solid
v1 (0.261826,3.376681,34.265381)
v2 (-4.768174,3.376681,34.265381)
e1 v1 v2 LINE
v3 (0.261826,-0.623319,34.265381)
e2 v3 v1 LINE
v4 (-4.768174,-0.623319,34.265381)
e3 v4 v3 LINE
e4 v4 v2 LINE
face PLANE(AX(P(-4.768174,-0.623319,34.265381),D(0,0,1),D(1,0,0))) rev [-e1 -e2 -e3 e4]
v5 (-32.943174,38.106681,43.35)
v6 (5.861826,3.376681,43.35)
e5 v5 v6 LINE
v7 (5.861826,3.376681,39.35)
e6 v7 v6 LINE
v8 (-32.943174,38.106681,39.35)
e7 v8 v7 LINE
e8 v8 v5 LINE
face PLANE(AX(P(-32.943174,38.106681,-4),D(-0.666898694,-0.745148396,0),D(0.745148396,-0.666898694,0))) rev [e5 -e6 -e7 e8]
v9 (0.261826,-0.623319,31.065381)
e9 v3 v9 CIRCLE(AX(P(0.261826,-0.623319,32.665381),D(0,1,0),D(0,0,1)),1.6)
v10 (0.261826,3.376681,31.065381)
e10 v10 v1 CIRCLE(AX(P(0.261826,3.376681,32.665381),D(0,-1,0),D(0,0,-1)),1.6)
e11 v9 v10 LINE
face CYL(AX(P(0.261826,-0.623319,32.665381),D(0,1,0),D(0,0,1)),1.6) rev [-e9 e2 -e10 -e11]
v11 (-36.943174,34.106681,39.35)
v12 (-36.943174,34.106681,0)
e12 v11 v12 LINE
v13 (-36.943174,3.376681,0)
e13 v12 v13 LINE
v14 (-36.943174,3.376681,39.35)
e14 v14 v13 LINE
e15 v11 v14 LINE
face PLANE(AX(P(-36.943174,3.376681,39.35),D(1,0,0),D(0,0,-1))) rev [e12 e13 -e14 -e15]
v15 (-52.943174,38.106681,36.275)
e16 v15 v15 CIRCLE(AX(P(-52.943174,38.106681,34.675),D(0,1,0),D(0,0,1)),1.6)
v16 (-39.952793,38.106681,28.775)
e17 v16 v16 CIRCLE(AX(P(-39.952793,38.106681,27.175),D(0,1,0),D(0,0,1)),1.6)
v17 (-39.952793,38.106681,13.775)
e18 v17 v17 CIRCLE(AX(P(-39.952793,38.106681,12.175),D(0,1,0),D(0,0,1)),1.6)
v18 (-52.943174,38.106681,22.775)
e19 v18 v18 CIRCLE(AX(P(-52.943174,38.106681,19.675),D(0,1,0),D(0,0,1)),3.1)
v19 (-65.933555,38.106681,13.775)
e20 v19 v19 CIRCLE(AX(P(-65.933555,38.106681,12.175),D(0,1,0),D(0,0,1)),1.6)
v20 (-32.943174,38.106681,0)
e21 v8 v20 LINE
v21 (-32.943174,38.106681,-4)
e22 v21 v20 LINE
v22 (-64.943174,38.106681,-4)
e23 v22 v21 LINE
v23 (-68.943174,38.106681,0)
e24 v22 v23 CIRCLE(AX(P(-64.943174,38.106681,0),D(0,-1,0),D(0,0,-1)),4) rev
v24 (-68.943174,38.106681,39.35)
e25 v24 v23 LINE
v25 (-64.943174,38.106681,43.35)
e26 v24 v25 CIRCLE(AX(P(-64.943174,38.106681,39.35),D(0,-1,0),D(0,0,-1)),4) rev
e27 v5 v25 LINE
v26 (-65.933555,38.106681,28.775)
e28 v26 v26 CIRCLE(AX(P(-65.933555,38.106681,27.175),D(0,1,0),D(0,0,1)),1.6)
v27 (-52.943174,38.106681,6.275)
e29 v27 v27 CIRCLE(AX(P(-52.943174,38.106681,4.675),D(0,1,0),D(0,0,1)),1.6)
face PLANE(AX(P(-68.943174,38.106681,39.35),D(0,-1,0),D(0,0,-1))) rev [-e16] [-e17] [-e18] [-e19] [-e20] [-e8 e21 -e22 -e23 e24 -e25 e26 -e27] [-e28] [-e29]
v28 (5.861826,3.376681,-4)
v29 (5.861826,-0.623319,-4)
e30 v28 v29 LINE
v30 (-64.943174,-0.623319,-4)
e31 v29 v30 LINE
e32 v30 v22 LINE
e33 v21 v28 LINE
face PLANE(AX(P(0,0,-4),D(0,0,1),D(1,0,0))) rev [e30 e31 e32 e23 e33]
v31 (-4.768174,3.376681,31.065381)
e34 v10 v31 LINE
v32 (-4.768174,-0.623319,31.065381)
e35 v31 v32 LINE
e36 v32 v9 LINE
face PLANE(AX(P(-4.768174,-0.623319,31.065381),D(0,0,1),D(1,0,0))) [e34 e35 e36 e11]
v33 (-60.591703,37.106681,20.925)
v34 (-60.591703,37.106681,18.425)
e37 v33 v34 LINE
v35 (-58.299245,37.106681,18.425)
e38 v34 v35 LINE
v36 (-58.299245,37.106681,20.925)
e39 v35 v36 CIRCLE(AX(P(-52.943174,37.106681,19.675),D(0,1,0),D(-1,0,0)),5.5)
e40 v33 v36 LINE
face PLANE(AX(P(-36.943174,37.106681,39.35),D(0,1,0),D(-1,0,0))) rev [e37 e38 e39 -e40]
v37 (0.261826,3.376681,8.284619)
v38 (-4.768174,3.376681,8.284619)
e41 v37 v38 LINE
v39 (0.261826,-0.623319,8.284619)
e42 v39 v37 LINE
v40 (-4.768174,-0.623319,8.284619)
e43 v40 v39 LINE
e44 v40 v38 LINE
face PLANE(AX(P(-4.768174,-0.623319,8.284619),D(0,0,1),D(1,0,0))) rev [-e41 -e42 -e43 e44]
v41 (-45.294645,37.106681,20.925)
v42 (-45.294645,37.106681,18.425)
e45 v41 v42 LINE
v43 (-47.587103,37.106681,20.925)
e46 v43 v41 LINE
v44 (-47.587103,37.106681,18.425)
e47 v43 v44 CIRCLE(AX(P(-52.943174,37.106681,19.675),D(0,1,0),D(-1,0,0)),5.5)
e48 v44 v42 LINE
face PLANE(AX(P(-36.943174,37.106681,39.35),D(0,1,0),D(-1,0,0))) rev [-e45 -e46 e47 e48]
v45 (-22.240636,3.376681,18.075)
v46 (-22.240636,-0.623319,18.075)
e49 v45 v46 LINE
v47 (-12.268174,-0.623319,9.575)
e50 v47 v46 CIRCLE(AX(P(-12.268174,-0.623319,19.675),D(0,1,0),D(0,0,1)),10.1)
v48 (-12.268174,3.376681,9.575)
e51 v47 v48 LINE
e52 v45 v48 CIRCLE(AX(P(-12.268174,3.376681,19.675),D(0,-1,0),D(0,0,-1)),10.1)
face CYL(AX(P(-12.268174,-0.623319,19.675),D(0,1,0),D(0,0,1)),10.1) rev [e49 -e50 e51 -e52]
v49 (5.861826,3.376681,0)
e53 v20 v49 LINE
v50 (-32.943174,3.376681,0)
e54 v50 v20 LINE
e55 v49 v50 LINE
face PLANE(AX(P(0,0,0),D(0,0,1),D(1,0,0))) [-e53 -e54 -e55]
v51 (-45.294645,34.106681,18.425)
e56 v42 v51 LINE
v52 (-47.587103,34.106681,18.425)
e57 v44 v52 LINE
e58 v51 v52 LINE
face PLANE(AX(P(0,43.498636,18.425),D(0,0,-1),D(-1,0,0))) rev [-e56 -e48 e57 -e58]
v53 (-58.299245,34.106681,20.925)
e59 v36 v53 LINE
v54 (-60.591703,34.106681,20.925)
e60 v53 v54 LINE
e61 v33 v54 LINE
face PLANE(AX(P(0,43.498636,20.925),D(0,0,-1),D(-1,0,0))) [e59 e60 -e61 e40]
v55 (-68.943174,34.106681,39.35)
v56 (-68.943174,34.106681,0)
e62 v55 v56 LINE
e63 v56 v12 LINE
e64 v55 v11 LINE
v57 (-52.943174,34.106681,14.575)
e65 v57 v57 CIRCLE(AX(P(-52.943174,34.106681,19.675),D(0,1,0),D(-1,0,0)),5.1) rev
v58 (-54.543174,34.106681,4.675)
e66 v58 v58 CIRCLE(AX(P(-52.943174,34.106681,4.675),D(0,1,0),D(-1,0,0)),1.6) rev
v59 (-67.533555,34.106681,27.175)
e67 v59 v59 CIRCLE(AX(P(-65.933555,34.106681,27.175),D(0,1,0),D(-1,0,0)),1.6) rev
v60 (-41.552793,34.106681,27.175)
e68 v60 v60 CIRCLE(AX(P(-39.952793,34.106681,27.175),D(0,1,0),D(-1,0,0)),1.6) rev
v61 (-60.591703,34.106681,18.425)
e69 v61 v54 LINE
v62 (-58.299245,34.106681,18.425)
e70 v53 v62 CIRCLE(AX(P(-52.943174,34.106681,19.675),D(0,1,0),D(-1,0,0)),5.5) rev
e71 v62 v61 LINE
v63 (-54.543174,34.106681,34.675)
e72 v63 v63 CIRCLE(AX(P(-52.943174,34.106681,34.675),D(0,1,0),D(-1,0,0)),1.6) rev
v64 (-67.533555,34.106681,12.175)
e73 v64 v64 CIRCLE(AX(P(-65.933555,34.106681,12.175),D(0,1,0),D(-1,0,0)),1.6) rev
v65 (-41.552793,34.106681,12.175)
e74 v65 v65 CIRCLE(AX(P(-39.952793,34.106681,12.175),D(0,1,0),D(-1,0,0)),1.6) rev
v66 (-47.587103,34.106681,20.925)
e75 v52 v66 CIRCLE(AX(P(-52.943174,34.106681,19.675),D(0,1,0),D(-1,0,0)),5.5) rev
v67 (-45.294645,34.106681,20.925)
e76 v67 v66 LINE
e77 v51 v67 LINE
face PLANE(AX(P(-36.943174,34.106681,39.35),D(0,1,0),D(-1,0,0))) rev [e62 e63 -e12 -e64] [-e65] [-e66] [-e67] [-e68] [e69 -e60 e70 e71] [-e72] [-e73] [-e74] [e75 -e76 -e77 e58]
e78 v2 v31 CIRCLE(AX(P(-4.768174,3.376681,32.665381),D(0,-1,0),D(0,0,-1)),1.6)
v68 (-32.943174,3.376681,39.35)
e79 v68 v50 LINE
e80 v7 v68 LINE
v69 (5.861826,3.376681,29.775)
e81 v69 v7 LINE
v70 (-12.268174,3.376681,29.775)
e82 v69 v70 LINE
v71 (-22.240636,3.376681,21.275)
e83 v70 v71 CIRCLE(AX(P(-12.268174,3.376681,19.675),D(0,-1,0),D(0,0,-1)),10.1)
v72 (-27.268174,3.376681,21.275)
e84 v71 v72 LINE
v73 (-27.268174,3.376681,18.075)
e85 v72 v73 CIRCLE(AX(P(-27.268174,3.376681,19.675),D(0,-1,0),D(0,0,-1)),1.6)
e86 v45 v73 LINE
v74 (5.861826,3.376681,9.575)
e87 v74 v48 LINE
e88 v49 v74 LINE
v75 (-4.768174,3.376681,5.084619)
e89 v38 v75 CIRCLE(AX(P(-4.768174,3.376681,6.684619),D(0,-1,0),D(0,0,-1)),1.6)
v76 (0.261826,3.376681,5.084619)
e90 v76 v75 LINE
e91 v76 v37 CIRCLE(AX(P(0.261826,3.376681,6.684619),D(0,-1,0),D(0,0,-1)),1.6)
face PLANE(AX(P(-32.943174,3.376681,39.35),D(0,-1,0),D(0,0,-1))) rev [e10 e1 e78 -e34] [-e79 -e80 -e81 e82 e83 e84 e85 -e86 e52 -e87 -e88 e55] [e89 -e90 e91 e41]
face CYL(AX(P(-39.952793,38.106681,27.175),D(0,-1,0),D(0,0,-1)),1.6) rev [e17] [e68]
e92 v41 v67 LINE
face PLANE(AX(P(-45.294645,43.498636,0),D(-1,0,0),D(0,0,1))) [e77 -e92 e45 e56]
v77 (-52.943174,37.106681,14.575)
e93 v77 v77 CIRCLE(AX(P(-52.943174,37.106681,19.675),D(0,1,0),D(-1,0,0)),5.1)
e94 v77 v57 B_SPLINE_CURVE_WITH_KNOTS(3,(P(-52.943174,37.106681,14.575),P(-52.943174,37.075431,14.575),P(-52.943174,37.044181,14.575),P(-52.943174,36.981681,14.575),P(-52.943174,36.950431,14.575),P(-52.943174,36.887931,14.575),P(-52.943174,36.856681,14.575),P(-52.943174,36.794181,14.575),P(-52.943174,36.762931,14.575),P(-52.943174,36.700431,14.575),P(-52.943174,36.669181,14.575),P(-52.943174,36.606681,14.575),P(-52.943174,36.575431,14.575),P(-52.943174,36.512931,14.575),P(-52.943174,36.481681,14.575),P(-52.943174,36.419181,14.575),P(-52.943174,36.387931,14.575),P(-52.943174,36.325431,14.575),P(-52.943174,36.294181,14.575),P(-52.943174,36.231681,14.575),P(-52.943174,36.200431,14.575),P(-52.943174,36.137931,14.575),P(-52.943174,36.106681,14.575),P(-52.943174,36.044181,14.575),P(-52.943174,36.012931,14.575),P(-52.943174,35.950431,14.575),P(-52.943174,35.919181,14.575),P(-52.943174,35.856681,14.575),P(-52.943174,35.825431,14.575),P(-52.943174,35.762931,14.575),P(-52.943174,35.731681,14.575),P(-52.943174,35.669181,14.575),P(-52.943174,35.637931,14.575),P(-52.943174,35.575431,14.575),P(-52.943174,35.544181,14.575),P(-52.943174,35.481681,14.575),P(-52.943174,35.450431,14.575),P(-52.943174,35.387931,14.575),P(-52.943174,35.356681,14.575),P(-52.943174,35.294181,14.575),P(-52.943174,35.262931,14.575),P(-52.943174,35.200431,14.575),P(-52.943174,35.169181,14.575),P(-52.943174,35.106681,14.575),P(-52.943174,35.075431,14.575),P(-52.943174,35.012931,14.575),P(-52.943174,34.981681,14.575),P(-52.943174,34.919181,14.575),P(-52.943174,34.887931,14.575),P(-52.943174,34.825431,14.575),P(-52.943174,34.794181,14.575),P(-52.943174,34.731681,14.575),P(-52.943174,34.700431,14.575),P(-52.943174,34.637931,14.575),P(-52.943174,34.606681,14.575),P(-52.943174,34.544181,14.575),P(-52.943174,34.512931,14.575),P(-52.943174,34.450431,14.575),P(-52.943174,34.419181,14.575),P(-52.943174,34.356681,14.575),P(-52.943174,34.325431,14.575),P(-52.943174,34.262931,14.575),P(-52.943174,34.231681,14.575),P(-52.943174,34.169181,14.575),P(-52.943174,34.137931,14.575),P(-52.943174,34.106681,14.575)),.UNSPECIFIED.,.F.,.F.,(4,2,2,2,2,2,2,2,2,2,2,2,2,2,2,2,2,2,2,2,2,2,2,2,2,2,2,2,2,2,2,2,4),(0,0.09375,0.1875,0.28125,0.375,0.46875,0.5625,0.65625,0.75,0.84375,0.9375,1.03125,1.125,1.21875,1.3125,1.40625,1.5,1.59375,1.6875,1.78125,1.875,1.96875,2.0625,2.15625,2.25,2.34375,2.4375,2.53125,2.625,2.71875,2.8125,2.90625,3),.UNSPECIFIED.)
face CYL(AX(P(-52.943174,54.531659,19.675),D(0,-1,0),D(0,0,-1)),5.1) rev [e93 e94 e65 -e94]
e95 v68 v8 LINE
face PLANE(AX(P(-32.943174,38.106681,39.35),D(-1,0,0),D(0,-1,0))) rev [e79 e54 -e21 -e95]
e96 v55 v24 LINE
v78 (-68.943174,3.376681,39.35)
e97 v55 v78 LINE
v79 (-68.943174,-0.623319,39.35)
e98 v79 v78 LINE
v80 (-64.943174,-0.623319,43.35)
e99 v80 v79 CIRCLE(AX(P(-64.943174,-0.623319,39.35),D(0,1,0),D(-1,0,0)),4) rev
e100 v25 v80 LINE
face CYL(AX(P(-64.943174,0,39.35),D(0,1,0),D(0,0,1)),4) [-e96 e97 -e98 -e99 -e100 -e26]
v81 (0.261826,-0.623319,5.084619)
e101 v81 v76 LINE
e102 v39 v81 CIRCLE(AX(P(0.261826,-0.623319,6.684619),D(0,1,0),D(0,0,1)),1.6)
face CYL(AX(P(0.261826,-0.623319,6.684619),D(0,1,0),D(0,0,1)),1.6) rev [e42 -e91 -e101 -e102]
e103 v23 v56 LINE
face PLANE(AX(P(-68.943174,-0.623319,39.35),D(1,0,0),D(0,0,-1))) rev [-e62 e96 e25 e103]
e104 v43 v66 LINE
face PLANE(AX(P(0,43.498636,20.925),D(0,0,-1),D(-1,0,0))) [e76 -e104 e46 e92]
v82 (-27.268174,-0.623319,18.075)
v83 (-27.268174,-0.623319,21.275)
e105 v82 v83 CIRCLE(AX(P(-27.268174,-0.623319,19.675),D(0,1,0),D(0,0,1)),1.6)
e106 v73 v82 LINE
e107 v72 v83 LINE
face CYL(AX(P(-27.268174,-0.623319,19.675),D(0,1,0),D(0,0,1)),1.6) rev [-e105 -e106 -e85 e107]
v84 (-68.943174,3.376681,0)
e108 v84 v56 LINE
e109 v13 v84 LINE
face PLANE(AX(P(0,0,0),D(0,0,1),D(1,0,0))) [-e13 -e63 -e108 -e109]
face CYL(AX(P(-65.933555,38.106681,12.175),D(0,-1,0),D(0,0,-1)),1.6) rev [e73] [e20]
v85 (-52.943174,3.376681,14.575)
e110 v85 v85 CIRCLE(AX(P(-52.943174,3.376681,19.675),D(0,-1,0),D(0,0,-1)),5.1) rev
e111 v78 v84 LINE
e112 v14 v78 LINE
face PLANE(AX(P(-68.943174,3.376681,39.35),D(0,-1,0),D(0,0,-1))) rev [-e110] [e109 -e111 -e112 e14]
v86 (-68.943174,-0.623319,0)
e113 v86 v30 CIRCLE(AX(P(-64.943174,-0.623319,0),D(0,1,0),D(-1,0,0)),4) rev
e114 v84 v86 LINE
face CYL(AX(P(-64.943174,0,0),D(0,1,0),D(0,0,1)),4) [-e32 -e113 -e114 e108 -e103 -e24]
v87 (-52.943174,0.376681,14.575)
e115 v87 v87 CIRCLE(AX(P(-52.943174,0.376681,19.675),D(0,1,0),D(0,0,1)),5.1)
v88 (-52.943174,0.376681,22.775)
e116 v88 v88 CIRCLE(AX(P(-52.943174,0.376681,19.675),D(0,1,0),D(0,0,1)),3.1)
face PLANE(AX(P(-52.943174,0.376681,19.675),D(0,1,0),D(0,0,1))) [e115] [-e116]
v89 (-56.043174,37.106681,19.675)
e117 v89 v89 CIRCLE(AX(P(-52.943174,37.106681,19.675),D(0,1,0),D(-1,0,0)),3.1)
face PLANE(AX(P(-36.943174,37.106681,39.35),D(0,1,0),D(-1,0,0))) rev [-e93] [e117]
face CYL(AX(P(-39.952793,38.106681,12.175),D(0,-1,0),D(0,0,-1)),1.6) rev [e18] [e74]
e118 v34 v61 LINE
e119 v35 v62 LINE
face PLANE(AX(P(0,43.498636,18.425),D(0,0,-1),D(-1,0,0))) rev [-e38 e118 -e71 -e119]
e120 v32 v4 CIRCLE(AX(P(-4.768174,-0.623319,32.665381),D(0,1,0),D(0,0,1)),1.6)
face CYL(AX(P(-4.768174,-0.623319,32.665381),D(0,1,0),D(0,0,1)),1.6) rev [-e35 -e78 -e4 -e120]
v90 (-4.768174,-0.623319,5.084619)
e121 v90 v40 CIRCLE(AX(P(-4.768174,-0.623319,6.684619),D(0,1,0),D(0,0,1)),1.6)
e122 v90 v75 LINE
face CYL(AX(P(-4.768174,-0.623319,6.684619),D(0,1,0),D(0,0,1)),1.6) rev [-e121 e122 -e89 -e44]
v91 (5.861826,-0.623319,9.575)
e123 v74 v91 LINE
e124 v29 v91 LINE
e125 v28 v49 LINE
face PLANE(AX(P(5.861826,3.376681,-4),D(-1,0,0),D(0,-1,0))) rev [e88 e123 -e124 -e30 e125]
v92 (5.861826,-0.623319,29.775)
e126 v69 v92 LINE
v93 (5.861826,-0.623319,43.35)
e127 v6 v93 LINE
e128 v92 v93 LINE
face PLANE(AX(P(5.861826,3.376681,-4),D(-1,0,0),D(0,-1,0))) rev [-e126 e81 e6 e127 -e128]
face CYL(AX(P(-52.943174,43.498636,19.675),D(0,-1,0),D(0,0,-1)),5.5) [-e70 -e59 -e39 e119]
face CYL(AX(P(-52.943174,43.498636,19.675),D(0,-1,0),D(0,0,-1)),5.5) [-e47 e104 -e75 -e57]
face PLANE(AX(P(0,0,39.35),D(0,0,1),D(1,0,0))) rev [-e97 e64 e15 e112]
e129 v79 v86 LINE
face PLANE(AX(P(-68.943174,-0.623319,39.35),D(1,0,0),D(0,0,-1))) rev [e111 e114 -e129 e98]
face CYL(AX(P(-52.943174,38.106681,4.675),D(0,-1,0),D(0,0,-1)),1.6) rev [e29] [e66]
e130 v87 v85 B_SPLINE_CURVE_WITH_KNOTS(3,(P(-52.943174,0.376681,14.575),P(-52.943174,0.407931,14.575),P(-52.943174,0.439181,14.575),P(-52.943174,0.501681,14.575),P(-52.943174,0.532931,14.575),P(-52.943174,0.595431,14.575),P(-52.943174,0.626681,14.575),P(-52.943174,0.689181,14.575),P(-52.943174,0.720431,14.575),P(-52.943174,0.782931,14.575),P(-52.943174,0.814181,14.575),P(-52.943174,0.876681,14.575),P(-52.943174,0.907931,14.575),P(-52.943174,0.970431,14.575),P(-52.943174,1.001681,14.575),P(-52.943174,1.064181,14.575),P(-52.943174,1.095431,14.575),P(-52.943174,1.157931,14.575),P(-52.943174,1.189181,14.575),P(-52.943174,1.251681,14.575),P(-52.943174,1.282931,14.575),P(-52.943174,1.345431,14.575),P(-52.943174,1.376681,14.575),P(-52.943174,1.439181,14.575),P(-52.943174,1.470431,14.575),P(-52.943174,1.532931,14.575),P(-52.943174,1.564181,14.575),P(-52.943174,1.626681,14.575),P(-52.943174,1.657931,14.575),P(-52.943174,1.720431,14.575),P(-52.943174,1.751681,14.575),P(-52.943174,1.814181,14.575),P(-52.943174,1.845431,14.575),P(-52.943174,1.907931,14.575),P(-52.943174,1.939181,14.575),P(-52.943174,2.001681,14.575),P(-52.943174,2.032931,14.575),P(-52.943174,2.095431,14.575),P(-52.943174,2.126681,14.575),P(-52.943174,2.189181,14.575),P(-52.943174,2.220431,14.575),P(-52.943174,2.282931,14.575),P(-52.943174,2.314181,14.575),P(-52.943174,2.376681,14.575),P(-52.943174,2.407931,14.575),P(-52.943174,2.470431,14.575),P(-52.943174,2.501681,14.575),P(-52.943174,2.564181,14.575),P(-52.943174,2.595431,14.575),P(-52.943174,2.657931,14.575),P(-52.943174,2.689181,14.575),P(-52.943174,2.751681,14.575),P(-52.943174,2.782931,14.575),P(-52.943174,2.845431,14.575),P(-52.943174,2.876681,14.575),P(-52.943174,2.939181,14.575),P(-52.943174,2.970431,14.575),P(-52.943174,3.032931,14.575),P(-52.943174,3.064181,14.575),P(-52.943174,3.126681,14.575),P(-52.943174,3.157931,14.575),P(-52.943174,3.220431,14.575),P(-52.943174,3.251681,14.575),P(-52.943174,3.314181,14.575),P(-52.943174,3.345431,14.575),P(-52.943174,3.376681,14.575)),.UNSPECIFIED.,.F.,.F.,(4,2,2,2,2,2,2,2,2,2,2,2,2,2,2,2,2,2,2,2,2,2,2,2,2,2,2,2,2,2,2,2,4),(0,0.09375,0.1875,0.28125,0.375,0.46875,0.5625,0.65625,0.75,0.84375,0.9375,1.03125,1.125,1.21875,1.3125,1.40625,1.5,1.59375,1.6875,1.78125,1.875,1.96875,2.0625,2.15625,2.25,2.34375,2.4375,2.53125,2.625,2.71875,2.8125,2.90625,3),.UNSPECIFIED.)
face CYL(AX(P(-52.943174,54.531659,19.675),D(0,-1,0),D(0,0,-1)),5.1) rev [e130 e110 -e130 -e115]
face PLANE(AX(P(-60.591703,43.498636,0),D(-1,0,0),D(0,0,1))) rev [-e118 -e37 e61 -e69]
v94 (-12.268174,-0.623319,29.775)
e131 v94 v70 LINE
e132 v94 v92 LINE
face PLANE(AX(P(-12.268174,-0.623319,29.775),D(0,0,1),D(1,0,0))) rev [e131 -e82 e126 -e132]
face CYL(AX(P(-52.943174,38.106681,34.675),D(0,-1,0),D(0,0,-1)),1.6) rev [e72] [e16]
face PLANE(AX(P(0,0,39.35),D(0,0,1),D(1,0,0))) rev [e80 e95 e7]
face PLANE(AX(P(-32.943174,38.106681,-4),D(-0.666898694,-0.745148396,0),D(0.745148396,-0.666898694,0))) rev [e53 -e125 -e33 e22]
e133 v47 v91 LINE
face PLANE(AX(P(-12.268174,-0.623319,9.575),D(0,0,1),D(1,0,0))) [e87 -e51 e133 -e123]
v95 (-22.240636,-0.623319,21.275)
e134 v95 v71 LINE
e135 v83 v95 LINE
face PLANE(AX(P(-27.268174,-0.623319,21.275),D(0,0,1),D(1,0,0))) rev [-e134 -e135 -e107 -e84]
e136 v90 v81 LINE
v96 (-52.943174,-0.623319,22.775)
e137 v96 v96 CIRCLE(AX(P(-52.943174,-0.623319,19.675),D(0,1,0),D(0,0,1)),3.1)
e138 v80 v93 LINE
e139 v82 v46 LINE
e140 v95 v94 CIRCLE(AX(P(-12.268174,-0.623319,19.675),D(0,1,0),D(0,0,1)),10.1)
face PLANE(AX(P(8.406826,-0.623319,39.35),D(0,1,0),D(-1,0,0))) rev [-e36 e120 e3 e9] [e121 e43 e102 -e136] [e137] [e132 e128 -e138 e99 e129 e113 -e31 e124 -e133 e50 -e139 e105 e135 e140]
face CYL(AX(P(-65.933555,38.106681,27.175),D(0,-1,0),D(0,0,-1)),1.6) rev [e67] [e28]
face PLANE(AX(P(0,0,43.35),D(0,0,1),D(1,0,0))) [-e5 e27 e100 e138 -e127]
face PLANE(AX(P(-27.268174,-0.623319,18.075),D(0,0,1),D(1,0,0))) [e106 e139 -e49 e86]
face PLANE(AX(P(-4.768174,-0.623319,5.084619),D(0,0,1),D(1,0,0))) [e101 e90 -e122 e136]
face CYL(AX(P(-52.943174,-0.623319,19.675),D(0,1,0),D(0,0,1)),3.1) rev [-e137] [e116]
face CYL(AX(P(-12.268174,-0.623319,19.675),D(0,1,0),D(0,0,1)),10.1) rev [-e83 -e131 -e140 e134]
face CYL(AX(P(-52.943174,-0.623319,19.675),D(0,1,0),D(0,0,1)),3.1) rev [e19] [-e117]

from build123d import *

# Parameters (mm, degrees)
BOSS_EXTRUDE1_DEPTH     = 39.35
CUT_EXTRUDE2_DEPTH      = 33.73
CUT_EXTRUDE2_DEPTH_BACK = 3
SKETCH3_R               = 5.1
CUT_EXTRUDE3_DEPTH      = 33.73
CUT_EXTRUDE4_DEPTH      = 87.647311883
CUT_EXTRUDE4_DEPTH_BACK = 87.647311883
SKETCH3_5_R             = 3.1
SKETCH3_5_R_2           = 10.1
SKETCH3_5_R_3           = 1.6
SKETCH3_5_W             = 20.675
SKETCH3_5_H             = 20.2
SKETCH3_5_W_2           = 5.027537917
SKETCH3_5_H_2           = 3.2
SKETCH3_5_W_3           = 5.03
SKETCH3_6_R             = 1.6
CUT_EXTRUDE5_DEPTH      = 87.647311883
SKETCH4_W               = 77.35
SKETCH4_H               = 38.73
BOSS_EXTRUDE2_DEPTH     = 4
SKETCH5_W               = 77.35
SKETCH5_H               = 38.73
BOSS_EXTRUDE3_DEPTH     = 4
CUT_EXTRUDE6_DEPTH      = 92.909209967
CUT_EXTRUDE6_DEPTH_BACK = 92.909209967
FILLET1_R               = 4


with BuildPart() as part:
    # Sketch1 → Boss-Extrude1 (new body)
    with BuildSketch(Plane.XY):
        Polygon((-68.943174111, 38.106680783), (-32.943174111, 38.106680783), (-32.943174111, 3.376680783), (8.406825889, 3.376680783), (8.406825889, -0.623319217), (-68.943174111, -0.623319217), (-68.943174111, 3.376680783), (-36.943174111, 3.376680783), (-36.943174111, 34.106680783), (-68.943174111, 34.106680783), align=None)
    extrude(amount=BOSS_EXTRUDE1_DEPTH)

    # Sketch3 → Cut-Extrude2 (cut, two sides: drawn at the far end of the back side and taken through both)
    with BuildSketch(Plane(origin=(0, 3.376680783, 0), x_dir=(1, 0, 0), z_dir=(0, 1, 0)).offset(-CUT_EXTRUDE2_DEPTH_BACK)):
        with Locations(Location((-52.943174111, -19.675, 0), (0, 0, 90))):
            Circle(SKETCH3_R)
    extrude(amount=CUT_EXTRUDE2_DEPTH + CUT_EXTRUDE2_DEPTH_BACK, mode=Mode.SUBTRACT)

    # Sketch3<4> → Cut-Extrude3 (cut)
    with BuildSketch(Plane(origin=(0, 3.376680783, 0), x_dir=(1, 0, 0), z_dir=(0, 1, 0))):
        with BuildLine():
            Line((-47.58710279, -20.925), (-45.294644841, -20.925))
            Line((-45.294644841, -20.925), (-45.294644841, -18.425))
            Line((-45.294644841, -18.425), (-47.58710279, -18.425))
            ThreePointArc((-47.58710279, -18.425), (-47.479274758, -19.045870549), (-47.443174111, -19.675))
            ThreePointArc((-47.443174111, -19.675), (-47.479274758, -20.304129451), (-47.58710279, -20.925))
        make_face()
        with BuildLine():
            Line((-60.591703381, -18.425), (-60.591703381, -20.925))
            Line((-60.591703381, -20.925), (-58.299245432, -20.925))
            ThreePointArc((-58.299245432, -20.925), (-58.443174111, -19.675), (-58.299245432, -18.425))
            Line((-58.299245432, -18.425), (-60.591703381, -18.425))
        make_face()
    extrude(amount=CUT_EXTRUDE3_DEPTH, mode=Mode.SUBTRACT)

    # Sketch3<5> → Cut-Extrude4 (cut, two sides: drawn at the far end of the back side and taken through both)
    with BuildSketch(Plane(origin=(0, 3.376680783, 0), x_dir=(1, 0, 0), z_dir=(0, 1, 0)).offset(-CUT_EXTRUDE4_DEPTH_BACK)):
        with Locations(Location((-52.943174111, -19.675, 0), (0, 0, 270))):
            Circle(SKETCH3_5_R)
        with Locations((-12.268174111, -19.675)):
            Circle(SKETCH3_5_R_2)
        with Locations((-4.768174111, -32.665381057)):
            Circle(SKETCH3_5_R_3)
        with Locations((-4.768174111, -6.684618943)):
            Circle(SKETCH3_5_R_3)
        with Locations((-27.268174111, -19.675)):
            Circle(SKETCH3_5_R_3)
        with Locations((0.261825889, -32.665381057)):
            Circle(SKETCH3_5_R_3)
        with Locations((0.261825889, -6.684618943)):
            Circle(SKETCH3_5_R_3)
        with Locations((-1.930674111, -19.675)):
            Rectangle(SKETCH3_5_W, SKETCH3_5_H)
        with Locations((-24.754405152, -19.675)):
            Rectangle(SKETCH3_5_W_2, SKETCH3_5_H_2)
        with Locations((-2.253174111, -32.665381057)):
            Rectangle(SKETCH3_5_W_3, SKETCH3_5_H_2)
        with Locations((-2.253174111, -6.684618943)):
            Rectangle(SKETCH3_5_W_3, SKETCH3_5_H_2)
    extrude(amount=CUT_EXTRUDE4_DEPTH + CUT_EXTRUDE4_DEPTH_BACK, mode=Mode.SUBTRACT)

    # Sketch3<6> → Cut-Extrude5 (cut, through all)
    with BuildSketch(Plane(origin=(0, 3.376680783, 0), x_dir=(1, 0, 0), z_dir=(0, 1, 0))):
        with Locations(Location((-52.943174111, -34.675, 0), (0, 0, 180))):
            Circle(SKETCH3_6_R)
        with Locations(Location((-65.933555168, -27.175, 0), (0, 0, 180))):
            Circle(SKETCH3_6_R)
        with Locations(Location((-65.933555168, -12.175, 0), (0, 0, 180))):
            Circle(SKETCH3_6_R)
        with Locations(Location((-52.943174111, -4.675, 0), (0, 0, 180))):
            Circle(SKETCH3_6_R)
        with Locations(Location((-39.952793054, -12.175, 0), (0, 0, 180))):
            Circle(SKETCH3_6_R)
        with Locations(Location((-39.952793054, -27.175, 0), (0, 0, 180))):
            Circle(SKETCH3_6_R)
    extrude(amount=CUT_EXTRUDE5_DEPTH, mode=Mode.SUBTRACT)

    # Sketch4 → Boss-Extrude2 (add)
    with BuildSketch(Plane.XY.offset(39.35)):
        with Locations((-30.268174111, 18.741680783)):
            Rectangle(SKETCH4_W, SKETCH4_H)
    extrude(amount=BOSS_EXTRUDE2_DEPTH)

    # Sketch5 → Boss-Extrude3 (add)
    with BuildSketch(Plane(origin=(0, 0, 0), x_dir=(-1, 0, 0), z_dir=(0, 0, -1))):
        with Locations((30.268174111, 18.741680783)):
            Rectangle(SKETCH5_W, SKETCH5_H)
    extrude(amount=BOSS_EXTRUDE3_DEPTH)

    # Sketch6 → Cut-Extrude6 (cut, two sides: drawn at the far end of the back side and taken through both)
    with BuildSketch(Plane.XY.offset(43.35).offset(-CUT_EXTRUDE6_DEPTH_BACK)):
        Polygon((-32.943174111, 38.106680783), (5.861825889, 3.376680783), (5.861825889, -0.623319217), (8.406825889, -0.623319217), (8.406825889, 38.106680783), align=None)
    extrude(amount=CUT_EXTRUDE6_DEPTH + CUT_EXTRUDE6_DEPTH_BACK, mode=Mode.SUBTRACT)

    # Fillet1
    fillet1_edges = [part.edges().sort_by_distance(p)[0] for p in [
        (-68.943174111, 18.741680783, 43.35),
        (-68.943174111, 18.741680783, -4),
    ]]
    fillet(fillet1_edges, radius=FILLET1_R - 0.0001)  # a hair under: the kernel refuses the full size


solid = part.part
